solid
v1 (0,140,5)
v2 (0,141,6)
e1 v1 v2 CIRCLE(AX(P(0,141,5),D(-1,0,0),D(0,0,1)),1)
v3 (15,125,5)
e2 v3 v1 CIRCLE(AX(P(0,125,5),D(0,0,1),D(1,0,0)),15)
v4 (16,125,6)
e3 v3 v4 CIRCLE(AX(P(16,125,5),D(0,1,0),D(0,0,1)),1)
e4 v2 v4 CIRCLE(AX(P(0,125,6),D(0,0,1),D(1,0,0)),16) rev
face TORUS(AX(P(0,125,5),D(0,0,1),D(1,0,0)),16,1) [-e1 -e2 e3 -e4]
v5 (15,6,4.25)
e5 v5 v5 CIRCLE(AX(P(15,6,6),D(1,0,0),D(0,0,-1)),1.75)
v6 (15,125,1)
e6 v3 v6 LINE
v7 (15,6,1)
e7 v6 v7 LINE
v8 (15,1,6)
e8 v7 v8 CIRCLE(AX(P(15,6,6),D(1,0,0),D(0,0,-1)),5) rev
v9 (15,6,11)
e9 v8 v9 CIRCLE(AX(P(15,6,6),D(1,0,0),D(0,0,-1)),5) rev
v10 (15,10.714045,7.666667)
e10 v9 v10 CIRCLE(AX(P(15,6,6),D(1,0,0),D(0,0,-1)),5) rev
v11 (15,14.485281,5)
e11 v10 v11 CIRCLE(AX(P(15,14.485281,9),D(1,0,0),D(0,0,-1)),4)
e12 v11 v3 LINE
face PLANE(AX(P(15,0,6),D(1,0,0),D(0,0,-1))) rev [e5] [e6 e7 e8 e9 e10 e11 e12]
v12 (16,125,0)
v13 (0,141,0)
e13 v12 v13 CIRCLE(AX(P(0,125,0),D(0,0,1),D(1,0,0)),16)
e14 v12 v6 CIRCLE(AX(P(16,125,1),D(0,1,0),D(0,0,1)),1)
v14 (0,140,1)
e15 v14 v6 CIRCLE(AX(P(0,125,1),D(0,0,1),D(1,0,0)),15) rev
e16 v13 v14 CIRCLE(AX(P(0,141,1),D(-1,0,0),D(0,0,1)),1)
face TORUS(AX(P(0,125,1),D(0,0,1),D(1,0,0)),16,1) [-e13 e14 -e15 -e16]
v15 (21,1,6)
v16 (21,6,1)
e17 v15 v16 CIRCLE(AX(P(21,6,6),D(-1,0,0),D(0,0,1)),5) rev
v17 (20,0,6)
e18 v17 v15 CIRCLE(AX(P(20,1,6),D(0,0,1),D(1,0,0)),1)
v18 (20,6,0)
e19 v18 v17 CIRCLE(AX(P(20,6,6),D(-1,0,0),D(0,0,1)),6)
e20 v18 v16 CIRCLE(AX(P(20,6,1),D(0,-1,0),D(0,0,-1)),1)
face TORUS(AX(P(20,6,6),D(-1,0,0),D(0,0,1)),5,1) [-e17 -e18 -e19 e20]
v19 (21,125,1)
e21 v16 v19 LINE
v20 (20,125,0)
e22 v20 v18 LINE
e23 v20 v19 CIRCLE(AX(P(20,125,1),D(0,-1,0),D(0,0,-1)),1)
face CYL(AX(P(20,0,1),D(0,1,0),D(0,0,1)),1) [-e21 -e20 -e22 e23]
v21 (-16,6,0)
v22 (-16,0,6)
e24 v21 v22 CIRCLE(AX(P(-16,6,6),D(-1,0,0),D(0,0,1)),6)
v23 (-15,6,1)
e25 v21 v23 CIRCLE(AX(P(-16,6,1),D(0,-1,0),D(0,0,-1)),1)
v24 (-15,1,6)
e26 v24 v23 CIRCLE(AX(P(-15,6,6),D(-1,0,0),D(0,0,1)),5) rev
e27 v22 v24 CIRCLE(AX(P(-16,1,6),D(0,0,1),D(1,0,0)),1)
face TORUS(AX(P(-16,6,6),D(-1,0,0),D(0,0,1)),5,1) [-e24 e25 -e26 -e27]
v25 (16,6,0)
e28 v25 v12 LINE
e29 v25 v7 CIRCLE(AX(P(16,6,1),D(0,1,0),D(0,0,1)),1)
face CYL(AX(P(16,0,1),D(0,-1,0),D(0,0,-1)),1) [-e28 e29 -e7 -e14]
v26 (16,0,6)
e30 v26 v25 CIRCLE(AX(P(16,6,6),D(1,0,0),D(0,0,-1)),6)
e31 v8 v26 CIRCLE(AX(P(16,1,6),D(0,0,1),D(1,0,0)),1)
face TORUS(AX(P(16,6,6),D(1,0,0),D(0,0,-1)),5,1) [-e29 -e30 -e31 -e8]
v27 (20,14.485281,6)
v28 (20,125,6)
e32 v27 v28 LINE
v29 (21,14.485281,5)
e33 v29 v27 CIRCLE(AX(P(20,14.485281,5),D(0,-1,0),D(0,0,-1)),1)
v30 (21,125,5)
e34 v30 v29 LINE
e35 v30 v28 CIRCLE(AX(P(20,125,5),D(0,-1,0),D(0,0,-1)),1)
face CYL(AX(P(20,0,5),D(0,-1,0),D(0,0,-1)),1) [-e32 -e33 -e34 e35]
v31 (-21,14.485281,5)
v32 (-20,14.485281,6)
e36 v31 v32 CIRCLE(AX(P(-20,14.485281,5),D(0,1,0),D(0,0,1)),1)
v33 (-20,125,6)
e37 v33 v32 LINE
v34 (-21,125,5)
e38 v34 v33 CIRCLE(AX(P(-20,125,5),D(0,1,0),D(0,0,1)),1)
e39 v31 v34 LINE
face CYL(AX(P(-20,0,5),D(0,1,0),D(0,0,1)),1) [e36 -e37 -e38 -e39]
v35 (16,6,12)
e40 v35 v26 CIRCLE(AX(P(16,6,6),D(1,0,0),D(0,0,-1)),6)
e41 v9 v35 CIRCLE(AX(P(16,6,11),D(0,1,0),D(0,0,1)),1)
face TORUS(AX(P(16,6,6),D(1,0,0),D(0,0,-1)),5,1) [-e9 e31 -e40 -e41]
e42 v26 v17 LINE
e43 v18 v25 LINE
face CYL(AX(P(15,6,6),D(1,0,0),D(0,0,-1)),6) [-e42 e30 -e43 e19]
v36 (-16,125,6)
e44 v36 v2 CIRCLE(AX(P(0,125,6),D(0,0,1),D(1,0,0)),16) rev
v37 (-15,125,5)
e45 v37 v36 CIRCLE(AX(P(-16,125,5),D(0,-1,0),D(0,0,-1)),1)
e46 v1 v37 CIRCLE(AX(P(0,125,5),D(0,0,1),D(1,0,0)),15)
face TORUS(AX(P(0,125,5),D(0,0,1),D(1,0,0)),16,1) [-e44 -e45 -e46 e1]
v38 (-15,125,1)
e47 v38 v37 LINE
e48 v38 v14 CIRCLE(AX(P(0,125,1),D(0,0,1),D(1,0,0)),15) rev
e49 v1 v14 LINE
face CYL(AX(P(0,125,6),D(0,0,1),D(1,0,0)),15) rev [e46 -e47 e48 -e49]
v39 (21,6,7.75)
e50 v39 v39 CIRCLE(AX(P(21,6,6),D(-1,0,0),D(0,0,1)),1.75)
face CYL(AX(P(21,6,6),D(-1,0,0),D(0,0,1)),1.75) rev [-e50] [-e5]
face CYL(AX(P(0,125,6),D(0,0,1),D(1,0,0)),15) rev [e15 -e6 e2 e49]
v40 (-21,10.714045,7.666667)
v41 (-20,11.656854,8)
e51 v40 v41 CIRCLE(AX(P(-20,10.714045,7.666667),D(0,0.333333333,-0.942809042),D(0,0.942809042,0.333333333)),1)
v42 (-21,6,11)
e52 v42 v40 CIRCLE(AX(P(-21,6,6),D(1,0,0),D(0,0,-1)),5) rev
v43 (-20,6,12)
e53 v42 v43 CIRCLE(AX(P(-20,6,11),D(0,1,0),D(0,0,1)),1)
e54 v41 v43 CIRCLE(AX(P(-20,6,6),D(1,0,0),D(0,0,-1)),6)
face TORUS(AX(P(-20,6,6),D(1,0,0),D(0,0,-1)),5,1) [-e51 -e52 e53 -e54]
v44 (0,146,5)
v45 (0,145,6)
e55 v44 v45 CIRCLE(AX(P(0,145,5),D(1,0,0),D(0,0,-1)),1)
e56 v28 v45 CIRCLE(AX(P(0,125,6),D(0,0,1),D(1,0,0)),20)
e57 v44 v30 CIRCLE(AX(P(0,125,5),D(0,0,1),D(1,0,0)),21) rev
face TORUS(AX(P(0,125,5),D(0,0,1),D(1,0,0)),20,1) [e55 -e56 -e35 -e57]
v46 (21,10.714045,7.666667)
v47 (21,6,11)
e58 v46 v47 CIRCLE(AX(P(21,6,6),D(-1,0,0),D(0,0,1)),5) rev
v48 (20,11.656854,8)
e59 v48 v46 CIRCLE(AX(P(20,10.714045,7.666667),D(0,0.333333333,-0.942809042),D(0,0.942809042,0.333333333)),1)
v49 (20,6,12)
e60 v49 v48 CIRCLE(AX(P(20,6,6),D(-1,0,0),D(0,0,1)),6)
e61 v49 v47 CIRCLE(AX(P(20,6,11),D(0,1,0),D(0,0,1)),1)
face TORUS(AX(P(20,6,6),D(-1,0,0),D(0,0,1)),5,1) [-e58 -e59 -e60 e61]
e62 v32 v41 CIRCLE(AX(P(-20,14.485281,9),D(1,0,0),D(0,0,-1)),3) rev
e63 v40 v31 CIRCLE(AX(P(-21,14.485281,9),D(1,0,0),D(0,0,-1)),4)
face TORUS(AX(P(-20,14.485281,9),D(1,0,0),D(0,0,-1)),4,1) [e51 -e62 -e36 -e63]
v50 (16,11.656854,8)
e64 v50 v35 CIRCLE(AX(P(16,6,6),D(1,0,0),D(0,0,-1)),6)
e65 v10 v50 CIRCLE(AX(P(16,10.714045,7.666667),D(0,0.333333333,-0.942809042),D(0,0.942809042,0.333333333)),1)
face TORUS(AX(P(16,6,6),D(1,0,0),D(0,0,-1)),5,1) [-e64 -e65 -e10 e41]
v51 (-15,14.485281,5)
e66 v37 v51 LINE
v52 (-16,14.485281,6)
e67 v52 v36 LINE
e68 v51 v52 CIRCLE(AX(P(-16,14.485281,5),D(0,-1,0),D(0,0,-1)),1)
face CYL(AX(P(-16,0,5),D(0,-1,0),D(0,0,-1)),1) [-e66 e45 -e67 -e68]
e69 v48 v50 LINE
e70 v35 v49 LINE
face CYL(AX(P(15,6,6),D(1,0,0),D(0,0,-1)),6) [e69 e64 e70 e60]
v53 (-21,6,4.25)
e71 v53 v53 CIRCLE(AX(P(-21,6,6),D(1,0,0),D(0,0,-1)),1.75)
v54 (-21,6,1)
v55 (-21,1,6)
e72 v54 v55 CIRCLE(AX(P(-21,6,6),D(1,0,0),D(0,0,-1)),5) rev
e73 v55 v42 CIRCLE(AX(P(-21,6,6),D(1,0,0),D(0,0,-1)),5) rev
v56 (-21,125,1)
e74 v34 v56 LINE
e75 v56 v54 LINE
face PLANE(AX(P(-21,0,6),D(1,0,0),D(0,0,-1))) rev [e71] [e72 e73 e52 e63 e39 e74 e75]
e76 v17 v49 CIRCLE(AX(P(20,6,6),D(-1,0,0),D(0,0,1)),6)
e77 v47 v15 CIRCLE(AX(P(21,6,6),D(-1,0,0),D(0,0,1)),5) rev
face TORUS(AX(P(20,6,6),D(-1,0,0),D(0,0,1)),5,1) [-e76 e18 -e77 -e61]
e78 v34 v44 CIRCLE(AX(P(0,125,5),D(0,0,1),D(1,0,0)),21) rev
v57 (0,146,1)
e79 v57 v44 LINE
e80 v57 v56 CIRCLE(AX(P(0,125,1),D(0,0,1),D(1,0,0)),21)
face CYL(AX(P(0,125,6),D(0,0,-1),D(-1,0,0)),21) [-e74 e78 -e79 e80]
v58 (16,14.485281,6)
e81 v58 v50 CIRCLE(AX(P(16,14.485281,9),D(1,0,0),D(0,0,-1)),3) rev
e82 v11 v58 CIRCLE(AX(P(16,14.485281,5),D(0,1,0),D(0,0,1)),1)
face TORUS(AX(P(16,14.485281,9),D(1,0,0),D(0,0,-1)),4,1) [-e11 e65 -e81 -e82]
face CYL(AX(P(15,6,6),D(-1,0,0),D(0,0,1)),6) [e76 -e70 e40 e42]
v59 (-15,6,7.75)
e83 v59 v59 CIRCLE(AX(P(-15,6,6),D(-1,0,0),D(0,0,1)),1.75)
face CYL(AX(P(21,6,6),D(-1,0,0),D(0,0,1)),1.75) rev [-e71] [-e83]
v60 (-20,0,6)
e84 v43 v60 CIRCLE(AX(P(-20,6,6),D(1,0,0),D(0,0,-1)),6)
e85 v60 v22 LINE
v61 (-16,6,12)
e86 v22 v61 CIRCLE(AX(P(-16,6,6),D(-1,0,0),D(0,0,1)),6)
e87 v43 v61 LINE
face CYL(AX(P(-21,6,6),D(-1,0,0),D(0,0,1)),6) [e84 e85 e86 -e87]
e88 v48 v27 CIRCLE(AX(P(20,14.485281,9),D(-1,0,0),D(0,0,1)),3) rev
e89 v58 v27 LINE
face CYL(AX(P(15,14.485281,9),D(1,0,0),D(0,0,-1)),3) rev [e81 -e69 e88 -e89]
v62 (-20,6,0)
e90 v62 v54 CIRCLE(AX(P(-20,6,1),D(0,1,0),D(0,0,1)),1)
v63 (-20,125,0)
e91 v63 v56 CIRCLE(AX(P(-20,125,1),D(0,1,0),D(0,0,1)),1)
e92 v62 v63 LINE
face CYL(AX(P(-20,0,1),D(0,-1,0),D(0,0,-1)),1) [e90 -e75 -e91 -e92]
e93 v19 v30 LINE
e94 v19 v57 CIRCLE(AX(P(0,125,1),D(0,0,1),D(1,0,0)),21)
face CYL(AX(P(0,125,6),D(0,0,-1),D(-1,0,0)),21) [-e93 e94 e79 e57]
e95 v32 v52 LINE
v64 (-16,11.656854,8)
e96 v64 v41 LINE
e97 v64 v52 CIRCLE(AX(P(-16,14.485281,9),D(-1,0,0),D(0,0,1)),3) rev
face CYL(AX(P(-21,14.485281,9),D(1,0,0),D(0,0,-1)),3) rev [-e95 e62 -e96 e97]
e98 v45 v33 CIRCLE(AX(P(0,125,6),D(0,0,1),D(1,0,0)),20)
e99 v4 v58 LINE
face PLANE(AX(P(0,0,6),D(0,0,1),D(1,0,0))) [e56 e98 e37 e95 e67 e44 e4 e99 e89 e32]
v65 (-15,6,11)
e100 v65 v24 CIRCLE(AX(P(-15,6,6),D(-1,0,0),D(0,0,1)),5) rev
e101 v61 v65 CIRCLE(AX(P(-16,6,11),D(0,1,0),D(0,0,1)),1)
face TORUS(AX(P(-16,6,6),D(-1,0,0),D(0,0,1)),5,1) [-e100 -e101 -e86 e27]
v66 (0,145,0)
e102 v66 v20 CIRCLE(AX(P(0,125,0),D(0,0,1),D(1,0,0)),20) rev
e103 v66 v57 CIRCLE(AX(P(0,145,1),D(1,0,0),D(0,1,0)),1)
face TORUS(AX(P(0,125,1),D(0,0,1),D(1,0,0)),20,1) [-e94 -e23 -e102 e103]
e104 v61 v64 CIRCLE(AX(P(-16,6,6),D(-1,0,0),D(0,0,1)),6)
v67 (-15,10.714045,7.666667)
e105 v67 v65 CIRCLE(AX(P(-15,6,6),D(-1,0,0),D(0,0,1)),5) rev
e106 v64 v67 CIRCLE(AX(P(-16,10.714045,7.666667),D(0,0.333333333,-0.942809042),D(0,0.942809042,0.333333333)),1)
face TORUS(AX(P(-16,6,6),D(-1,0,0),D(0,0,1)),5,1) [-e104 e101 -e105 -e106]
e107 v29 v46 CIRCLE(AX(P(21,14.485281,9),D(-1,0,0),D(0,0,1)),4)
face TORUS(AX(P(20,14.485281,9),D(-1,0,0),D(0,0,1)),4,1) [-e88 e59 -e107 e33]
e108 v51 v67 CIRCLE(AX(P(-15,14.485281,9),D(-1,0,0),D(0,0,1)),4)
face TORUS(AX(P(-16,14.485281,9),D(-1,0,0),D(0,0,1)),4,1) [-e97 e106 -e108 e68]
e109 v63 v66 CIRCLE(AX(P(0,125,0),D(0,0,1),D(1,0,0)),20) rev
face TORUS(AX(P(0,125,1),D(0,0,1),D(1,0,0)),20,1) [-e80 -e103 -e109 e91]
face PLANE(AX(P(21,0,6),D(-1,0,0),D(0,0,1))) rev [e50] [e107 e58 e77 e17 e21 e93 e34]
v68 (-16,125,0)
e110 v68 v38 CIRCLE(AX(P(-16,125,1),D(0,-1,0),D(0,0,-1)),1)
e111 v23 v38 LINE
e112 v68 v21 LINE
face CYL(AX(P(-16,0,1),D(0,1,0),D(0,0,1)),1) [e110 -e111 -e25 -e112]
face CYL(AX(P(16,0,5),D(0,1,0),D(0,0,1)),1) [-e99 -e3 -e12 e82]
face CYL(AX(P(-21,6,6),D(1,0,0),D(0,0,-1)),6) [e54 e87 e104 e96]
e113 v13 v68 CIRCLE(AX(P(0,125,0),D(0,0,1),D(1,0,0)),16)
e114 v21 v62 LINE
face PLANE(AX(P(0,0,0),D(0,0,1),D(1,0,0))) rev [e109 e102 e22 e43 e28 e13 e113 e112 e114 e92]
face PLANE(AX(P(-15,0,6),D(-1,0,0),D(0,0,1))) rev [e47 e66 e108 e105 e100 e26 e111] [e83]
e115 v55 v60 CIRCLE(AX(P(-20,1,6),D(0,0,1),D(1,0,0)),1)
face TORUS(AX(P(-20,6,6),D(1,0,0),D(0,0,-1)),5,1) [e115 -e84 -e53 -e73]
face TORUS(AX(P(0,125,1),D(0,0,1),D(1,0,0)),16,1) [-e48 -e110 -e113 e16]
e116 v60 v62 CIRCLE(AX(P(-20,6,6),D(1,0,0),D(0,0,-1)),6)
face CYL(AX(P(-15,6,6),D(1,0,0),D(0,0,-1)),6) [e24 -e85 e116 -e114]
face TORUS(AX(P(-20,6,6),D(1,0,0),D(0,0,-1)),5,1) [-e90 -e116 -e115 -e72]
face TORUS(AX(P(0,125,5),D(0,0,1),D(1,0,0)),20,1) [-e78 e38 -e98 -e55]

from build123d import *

# Parameters (mm, degrees)
BOSS_EXTRU_1_DEPTH           = 6
ESQUISSE2_W                  = 6
ESQUISSE2_H                  = 12
BOSS_EXTRU_2_DEPTH           = 6
BOSS_EXTRU_3_START           = -36
ESQUISSE2_2_W                = 6
ESQUISSE2_2_H                = 12
BOSS_EXTRU_3_DEPTH           = 6
CONG_1_R                     = 15
CONG_2_R                     = 21
ENL_V_MAT_EXTRU_1_DEPTH      = 153.394225612
ENL_V_MAT_EXTRU_1_DEPTH_BACK = 153.394225612
ESQUISSE3_R                  = 1.75
CONG_4_R                     = 6
CONG_5_R                     = 3
CONG_6_R                     = 1


with BuildPart() as part:
    # Esquisse1 → Boss.-Extru.1 (new body)
    with BuildSketch(Plane.XY):
        Polygon((15, 0), (15, 140), (-15, 140), (-15, 0), (-21, 0), (-21, 146), (21, 146), (21, 0), align=None)
    extrude(amount=BOSS_EXTRU_1_DEPTH)

    # Esquisse2 → Boss.-Extru.2 (add)
    with BuildSketch(Plane(origin=(21, 0, 0), x_dir=(0, 0, -1), z_dir=(1, 0, 0))):
        with Locations((-9, 6)):
            Rectangle(ESQUISSE2_W, ESQUISSE2_H)
    extrude(amount=-BOSS_EXTRU_2_DEPTH)

    # Esquisse2<2> → Boss.-Extru.3 (add)
    with BuildSketch(Plane(origin=(21, 0, 0), x_dir=(0, 0, -1), z_dir=(1, 0, 0)).offset(BOSS_EXTRU_3_START)):
        with Locations((-9, 6)):
            Rectangle(ESQUISSE2_2_W, ESQUISSE2_2_H)
    extrude(amount=-BOSS_EXTRU_3_DEPTH)

    # Congé1
    cong_1_edges = [part.edges().sort_by_distance(p)[0] for p in [
        (15, 140, 3),
        (-15, 140, 3),
    ]]
    fillet(cong_1_edges, radius=CONG_1_R - 0.0001)  # a hair under: the kernel refuses the full size

    # Congé2
    cong_2_edges = [part.edges().sort_by_distance(p)[0] for p in [
        (21, 146, 3),
        (-21, 146, 3),
    ]]
    fillet(cong_2_edges, radius=CONG_2_R - 0.0001)  # a hair under: the kernel refuses the full size

    # Esquisse3 → Enlèv. mat.-Extru.1 (cut, two sides: drawn at the far end of the back side and taken through both)
    with BuildSketch(Plane.ZY.offset(21).offset(-ENL_V_MAT_EXTRU_1_DEPTH_BACK)):
        with Locations((6, 6)):
            Circle(ESQUISSE3_R)
    extrude(amount=ENL_V_MAT_EXTRU_1_DEPTH + ENL_V_MAT_EXTRU_1_DEPTH_BACK, mode=Mode.SUBTRACT)

    # Congé4
    cong_4_edges = [part.edges().sort_by_distance(p)[0] for p in [
        (18, 0, 0),
        (-18, 0, 0),
        (18, 0, 12),
        (-18, 0, 12),
        (18, 12, 12),
        (-18, 12, 12),
    ]]
    fillet(cong_4_edges, radius=CONG_4_R - 0.0001)  # a hair under: the kernel refuses the full size

    # Congé5
    cong_5_edges = [part.edges().sort_by_distance(p)[0] for p in [
        (18, 12, 6),
        (-18, 12, 6),
    ]]
    fillet(cong_5_edges, radius=CONG_5_R)

    # Congé6
    cong_6_edges = [part.edges().sort_by_distance(p)[0] for p in [
        (21, 69.742705332, 6),
        (-15, 69.742705332, 6),
        (21, 9.464163125, 10.898984228),
        (-15, 9.464163125, 10.898984228),
        (21, 12.753250233, 6.550517061),
        (15, 12.753250233, 6.550517061),
        (-15, 12.753250233, 6.550517061),
        (-21, 12.753250233, 6.550517061),
        (15, 65.5, 0),
        (15, 69.742705332, 6),
        (10.606631007, 135.606631007, 0),
        (10.606631007, 135.606631007, 6),
        (-10.606631007, 135.606631007, 0),
        (-10.606631007, 135.606631007, 6),
        (-21, 65.5, 0),
        (-14.849271694, 139.849271694, 0),
        (14.849271694, 139.849271694, 0),
        (-21, 69.742705332, 6),
        (-14.849271694, 139.849271694, 6),
        (14.849271694, 139.849271694, 6),
        (21, 65.5, 0),
        (21, 1.757330024, 1.757330024),
        (21, 1.757330024, 10.242669976),
        (15, 1.757330024, 1.757330024),
        (15, 1.757330024, 10.242669976),
        (15, 9.464163125, 10.898984228),
        (-15, 65.5, 0),
        (-15, 1.757330024, 1.757330024),
        (-15, 1.757330024, 10.242669976),
        (-21, 1.757330024, 1.757330024),
        (-21, 1.757330024, 10.242669976),
        (-21, 9.464163125, 10.898984228),
    ]]
    fillet(cong_6_edges, radius=CONG_6_R)


solid = part.part
